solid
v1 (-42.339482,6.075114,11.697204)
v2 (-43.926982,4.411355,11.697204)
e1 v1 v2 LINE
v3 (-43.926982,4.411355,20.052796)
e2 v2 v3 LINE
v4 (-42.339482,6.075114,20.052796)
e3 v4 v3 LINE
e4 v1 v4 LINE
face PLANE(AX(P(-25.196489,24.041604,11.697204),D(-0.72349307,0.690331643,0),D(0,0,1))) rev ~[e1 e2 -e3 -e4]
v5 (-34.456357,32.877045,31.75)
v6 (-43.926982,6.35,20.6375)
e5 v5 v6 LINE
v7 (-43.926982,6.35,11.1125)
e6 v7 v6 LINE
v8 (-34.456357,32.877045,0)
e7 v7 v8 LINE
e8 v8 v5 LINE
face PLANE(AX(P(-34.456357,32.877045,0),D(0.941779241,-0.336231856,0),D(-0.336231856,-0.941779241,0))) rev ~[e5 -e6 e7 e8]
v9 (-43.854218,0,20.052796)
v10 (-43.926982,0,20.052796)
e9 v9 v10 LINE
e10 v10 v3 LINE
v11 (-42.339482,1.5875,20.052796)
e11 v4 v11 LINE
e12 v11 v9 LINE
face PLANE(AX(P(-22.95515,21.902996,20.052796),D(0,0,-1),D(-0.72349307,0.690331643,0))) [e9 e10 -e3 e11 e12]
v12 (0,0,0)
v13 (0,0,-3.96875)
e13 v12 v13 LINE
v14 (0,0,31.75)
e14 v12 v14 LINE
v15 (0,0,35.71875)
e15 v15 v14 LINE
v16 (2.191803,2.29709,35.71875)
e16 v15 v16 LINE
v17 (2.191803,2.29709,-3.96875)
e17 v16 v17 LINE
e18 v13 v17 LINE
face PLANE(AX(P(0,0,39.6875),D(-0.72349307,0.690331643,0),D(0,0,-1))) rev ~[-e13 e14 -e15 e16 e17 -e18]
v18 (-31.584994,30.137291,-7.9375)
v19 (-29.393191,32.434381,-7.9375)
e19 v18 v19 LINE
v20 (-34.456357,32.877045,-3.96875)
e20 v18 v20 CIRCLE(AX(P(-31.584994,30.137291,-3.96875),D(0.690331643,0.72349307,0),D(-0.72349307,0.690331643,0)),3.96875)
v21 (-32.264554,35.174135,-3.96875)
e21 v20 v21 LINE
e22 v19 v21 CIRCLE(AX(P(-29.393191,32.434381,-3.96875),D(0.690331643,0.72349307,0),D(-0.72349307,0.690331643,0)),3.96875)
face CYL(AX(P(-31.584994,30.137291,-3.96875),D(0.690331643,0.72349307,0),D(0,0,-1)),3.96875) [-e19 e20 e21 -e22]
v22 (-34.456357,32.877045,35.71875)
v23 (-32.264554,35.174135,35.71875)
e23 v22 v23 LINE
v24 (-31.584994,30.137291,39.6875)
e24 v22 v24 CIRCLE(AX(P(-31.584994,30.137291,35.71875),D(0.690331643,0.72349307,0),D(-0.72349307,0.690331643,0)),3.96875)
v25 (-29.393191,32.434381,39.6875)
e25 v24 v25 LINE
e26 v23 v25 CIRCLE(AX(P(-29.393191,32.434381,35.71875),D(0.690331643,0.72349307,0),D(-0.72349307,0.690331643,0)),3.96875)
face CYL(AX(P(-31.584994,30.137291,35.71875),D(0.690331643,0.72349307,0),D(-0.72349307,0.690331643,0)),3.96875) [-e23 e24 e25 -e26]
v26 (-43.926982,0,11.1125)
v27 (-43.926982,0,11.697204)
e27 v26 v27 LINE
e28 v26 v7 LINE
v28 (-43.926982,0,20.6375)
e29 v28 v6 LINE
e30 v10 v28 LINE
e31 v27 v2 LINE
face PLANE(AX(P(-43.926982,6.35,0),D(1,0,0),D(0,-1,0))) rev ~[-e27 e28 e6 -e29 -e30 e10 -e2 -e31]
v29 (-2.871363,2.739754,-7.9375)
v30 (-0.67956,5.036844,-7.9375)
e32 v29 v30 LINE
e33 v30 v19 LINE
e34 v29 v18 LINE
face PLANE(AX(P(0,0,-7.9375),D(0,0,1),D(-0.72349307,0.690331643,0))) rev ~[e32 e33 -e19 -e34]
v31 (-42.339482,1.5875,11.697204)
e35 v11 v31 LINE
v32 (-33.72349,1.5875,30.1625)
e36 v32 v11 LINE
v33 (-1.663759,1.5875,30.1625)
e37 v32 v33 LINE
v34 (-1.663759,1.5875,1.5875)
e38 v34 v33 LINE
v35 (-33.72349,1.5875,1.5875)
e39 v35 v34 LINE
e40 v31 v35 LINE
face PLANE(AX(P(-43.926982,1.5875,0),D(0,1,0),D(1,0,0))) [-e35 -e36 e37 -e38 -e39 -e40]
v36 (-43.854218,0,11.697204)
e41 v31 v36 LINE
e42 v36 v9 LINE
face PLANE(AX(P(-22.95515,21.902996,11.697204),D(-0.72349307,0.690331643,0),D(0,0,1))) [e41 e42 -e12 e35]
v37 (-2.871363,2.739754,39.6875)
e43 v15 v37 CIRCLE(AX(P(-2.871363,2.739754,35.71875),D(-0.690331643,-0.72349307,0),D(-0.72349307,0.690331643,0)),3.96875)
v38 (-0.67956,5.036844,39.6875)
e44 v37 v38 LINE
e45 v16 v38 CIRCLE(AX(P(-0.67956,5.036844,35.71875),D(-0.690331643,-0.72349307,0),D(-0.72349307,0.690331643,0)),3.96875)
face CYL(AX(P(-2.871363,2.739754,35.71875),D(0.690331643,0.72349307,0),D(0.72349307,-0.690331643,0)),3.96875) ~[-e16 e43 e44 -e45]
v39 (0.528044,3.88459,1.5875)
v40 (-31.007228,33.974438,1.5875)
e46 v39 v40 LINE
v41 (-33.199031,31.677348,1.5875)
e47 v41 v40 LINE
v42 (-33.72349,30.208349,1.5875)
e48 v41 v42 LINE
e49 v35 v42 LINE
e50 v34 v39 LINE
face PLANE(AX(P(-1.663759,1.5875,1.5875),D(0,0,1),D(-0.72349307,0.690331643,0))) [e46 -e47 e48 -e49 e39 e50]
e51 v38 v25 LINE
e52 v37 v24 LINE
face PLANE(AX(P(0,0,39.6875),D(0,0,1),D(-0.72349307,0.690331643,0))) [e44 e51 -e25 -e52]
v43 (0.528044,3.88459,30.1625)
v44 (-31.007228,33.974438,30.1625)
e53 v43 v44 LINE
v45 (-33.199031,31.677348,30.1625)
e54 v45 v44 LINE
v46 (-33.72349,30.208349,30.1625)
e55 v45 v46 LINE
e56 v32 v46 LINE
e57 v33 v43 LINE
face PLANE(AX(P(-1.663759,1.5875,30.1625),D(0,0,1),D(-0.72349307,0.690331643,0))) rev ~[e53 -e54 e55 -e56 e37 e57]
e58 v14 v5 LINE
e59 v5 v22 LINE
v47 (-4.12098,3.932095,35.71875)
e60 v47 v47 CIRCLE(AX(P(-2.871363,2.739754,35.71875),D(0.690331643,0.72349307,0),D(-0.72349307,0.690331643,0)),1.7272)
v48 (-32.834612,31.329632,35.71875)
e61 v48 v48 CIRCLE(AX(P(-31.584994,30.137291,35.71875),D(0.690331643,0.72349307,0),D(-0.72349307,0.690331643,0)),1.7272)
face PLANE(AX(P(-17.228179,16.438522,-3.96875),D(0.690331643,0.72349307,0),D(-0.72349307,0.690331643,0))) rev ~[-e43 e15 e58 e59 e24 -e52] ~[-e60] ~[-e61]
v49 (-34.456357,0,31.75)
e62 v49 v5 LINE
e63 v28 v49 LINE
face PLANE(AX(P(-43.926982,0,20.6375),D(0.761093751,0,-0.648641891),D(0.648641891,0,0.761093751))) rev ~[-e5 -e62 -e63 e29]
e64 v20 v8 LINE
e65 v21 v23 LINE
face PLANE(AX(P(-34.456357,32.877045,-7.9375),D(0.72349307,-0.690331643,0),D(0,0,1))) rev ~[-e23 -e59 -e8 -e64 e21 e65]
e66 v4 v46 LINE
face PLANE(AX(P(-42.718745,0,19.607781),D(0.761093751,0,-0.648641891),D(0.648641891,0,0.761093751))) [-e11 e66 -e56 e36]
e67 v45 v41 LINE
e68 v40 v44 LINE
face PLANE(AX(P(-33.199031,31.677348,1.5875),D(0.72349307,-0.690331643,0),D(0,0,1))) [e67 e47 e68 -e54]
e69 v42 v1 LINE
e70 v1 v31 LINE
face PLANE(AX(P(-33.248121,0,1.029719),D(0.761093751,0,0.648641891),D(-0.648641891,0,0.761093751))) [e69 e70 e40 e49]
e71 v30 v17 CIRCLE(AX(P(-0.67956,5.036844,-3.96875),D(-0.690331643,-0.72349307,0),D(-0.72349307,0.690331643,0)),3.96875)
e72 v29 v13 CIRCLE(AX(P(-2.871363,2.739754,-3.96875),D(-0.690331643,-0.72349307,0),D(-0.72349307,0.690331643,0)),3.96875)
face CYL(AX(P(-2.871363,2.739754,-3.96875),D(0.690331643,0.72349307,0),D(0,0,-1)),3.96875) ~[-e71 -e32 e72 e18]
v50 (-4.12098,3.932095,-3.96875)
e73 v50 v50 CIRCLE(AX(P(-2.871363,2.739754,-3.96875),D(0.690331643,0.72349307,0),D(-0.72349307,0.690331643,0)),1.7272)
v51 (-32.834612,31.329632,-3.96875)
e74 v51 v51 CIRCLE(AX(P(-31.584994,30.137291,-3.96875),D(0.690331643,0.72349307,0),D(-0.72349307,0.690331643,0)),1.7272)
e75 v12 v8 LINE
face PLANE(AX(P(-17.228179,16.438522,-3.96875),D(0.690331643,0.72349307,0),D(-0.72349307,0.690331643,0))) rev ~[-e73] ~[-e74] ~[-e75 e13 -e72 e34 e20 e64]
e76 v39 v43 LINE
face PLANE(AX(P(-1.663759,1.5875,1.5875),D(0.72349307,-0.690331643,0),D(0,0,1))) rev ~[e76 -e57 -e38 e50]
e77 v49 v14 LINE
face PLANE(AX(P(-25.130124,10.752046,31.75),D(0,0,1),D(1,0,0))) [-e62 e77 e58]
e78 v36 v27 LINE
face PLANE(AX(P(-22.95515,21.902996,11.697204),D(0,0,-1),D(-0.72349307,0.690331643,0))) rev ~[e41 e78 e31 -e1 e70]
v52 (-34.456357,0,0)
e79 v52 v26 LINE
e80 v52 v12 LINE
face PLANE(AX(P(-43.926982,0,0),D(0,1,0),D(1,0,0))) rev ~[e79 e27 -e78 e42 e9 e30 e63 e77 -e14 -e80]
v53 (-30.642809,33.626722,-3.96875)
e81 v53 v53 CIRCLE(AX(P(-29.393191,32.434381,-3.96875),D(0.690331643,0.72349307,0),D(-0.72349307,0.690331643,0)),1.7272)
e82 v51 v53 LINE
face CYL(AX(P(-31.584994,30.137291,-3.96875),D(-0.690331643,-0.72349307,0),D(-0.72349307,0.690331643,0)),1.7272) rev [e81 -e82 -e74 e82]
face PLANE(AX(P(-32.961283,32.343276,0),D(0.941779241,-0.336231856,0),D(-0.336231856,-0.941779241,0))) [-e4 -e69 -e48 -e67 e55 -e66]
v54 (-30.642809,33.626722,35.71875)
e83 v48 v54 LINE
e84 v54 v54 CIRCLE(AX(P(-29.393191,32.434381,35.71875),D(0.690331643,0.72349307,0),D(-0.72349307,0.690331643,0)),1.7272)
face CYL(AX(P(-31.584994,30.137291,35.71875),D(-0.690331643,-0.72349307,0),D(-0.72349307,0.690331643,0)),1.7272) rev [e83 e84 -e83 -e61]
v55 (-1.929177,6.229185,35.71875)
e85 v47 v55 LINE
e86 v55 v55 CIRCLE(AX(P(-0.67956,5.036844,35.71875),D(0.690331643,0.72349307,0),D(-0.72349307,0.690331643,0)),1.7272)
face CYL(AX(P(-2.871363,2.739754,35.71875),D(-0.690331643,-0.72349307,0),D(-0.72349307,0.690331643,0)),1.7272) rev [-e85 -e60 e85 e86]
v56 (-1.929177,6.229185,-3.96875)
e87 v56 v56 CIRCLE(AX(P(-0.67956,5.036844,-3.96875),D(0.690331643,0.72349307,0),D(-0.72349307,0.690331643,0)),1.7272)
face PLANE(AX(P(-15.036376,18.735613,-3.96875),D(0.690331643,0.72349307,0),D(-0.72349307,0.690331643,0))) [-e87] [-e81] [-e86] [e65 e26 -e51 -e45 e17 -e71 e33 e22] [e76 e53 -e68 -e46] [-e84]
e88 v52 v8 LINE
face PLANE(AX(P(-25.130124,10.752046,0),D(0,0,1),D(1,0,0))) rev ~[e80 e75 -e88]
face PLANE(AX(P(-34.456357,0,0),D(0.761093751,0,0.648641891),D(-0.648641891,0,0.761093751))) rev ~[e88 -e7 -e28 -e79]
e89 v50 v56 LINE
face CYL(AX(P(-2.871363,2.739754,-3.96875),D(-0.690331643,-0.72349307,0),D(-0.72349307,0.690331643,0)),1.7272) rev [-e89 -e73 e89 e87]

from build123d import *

# Parameters (mm, degrees)
F1_DEPTH = 31.75
F3_REACH = 47.4787425117
F4_T     = -1.5875
F5_W     = 3.0979418965
F5_H     = 8.3555914986
F6_REACH = 39.2365913389
F7_W     = 47.625
F7_H     = 7.9375
F7_R     = 1.7272
F7_H_2   = 31.75
F7_W_2   = 43.5875253129
F7_H_3   = 28.575
F8_DEPTH = 3.175
F9_R     = 3.96875


with BuildPart() as f1:
    # F0 (on Top) → F1 (new body)
    with BuildSketch(Plane.XY):
        Polygon((-43.9269818101, 0), (0, 0), (-34.4563574527, 32.8770445158), (-43.9269818101, 6.35), align=None)
    extrude(amount=F1_DEPTH)

    f3_end = f1.faces().sort_by_distance((-39.1916696314, 19.6135222579, 15.875))[0]
    # F2 (on face) → F3 (cut, up to a face of the model that its end follows)
    with BuildSketch(Plane.XZ):
        Polygon((-43.9269818101, 11.1125), (-43.9269818101, 0), (-34.4563574527, 0), align=None)
        Polygon((-34.4563574527, 31.75), (-43.9269818101, 31.75), (-43.9269818101, 20.6375), align=None)
    f3_long = extrude(amount=-F3_REACH, mode=Mode.PRIVATE)
    add(split(f3_long, bisect_by=f3_end, keep=Keep.BOTTOM, mode=Mode.PRIVATE), mode=Mode.SUBTRACT)

    # F4
    f4_openings = [f1.faces().sort_by_distance(p)[0] for p in [
        (-17.228179, 16.438522, 15.875),
    ]]
    offset(amount=F4_T, openings=f4_openings)

    f6_end = Plane(origin=(-43.9269818101, 3.175, 15.875), x_dir=(0, 0, -1), z_dir=(-1, 0, 0))
    # F5 (on face) → F6 (cut, up to a plane its end follows)
    with BuildSketch(Plane(origin=(0, 0, 0), x_dir=(-0.7234930699, 0.6903316434, 0), z_dir=(0.6903316434, 0.7234930699, 0))):
        with Locations((33.2771941037, 15.875)):
            Rectangle(F5_W, F5_H)
    f6_long = extrude(amount=-F6_REACH, mode=Mode.PRIVATE)
    add(split(f6_long, bisect_by=f6_end, keep=Keep.BOTTOM, mode=Mode.PRIVATE), mode=Mode.SUBTRACT)

    # F7 (on face) → F8 (join)
    with BuildSketch(Plane(origin=(0, 0, 0), x_dir=(-0.7234930699, 0.6903316434, 0), z_dir=(0.6903316434, 0.7234930699, 0))):
        with Locations((23.8125, -3.96875)):
            Rectangle(F7_W, F7_H)
        with Locations((3.96875, -3.96875)):
            Circle(F7_R, mode=Mode.SUBTRACT)
        with Locations((43.65625, -3.96875)):
            Circle(F7_R, mode=Mode.SUBTRACT)
        with Locations((23.8125, 35.71875)):
            Rectangle(F7_W, F7_H)
        with Locations((3.96875, 35.71875)):
            Circle(F7_R, mode=Mode.SUBTRACT)
        with Locations((43.65625, 35.71875)):
            Circle(F7_R, mode=Mode.SUBTRACT)
        with Locations((23.8125, 15.875)):
            Rectangle(F7_W, F7_H_2)
        with Locations((24.0933819992, 15.875)):
            Rectangle(F7_W_2, F7_H_3, mode=Mode.SUBTRACT)
    extrude(amount=F8_DEPTH)

    # F9
    f9_edges = [f1.edges().sort_by_distance(p)[0] for p in [
        (-33.360456, 34.02559, -7.9375),
        (1.095901, 1.148545, -7.9375),
        (-33.360456, 34.02559, 39.6875),
        (1.095901, 1.148545, 39.6875),
    ]]
    fillet(f9_edges, radius=F9_R)


solid = f1.part
